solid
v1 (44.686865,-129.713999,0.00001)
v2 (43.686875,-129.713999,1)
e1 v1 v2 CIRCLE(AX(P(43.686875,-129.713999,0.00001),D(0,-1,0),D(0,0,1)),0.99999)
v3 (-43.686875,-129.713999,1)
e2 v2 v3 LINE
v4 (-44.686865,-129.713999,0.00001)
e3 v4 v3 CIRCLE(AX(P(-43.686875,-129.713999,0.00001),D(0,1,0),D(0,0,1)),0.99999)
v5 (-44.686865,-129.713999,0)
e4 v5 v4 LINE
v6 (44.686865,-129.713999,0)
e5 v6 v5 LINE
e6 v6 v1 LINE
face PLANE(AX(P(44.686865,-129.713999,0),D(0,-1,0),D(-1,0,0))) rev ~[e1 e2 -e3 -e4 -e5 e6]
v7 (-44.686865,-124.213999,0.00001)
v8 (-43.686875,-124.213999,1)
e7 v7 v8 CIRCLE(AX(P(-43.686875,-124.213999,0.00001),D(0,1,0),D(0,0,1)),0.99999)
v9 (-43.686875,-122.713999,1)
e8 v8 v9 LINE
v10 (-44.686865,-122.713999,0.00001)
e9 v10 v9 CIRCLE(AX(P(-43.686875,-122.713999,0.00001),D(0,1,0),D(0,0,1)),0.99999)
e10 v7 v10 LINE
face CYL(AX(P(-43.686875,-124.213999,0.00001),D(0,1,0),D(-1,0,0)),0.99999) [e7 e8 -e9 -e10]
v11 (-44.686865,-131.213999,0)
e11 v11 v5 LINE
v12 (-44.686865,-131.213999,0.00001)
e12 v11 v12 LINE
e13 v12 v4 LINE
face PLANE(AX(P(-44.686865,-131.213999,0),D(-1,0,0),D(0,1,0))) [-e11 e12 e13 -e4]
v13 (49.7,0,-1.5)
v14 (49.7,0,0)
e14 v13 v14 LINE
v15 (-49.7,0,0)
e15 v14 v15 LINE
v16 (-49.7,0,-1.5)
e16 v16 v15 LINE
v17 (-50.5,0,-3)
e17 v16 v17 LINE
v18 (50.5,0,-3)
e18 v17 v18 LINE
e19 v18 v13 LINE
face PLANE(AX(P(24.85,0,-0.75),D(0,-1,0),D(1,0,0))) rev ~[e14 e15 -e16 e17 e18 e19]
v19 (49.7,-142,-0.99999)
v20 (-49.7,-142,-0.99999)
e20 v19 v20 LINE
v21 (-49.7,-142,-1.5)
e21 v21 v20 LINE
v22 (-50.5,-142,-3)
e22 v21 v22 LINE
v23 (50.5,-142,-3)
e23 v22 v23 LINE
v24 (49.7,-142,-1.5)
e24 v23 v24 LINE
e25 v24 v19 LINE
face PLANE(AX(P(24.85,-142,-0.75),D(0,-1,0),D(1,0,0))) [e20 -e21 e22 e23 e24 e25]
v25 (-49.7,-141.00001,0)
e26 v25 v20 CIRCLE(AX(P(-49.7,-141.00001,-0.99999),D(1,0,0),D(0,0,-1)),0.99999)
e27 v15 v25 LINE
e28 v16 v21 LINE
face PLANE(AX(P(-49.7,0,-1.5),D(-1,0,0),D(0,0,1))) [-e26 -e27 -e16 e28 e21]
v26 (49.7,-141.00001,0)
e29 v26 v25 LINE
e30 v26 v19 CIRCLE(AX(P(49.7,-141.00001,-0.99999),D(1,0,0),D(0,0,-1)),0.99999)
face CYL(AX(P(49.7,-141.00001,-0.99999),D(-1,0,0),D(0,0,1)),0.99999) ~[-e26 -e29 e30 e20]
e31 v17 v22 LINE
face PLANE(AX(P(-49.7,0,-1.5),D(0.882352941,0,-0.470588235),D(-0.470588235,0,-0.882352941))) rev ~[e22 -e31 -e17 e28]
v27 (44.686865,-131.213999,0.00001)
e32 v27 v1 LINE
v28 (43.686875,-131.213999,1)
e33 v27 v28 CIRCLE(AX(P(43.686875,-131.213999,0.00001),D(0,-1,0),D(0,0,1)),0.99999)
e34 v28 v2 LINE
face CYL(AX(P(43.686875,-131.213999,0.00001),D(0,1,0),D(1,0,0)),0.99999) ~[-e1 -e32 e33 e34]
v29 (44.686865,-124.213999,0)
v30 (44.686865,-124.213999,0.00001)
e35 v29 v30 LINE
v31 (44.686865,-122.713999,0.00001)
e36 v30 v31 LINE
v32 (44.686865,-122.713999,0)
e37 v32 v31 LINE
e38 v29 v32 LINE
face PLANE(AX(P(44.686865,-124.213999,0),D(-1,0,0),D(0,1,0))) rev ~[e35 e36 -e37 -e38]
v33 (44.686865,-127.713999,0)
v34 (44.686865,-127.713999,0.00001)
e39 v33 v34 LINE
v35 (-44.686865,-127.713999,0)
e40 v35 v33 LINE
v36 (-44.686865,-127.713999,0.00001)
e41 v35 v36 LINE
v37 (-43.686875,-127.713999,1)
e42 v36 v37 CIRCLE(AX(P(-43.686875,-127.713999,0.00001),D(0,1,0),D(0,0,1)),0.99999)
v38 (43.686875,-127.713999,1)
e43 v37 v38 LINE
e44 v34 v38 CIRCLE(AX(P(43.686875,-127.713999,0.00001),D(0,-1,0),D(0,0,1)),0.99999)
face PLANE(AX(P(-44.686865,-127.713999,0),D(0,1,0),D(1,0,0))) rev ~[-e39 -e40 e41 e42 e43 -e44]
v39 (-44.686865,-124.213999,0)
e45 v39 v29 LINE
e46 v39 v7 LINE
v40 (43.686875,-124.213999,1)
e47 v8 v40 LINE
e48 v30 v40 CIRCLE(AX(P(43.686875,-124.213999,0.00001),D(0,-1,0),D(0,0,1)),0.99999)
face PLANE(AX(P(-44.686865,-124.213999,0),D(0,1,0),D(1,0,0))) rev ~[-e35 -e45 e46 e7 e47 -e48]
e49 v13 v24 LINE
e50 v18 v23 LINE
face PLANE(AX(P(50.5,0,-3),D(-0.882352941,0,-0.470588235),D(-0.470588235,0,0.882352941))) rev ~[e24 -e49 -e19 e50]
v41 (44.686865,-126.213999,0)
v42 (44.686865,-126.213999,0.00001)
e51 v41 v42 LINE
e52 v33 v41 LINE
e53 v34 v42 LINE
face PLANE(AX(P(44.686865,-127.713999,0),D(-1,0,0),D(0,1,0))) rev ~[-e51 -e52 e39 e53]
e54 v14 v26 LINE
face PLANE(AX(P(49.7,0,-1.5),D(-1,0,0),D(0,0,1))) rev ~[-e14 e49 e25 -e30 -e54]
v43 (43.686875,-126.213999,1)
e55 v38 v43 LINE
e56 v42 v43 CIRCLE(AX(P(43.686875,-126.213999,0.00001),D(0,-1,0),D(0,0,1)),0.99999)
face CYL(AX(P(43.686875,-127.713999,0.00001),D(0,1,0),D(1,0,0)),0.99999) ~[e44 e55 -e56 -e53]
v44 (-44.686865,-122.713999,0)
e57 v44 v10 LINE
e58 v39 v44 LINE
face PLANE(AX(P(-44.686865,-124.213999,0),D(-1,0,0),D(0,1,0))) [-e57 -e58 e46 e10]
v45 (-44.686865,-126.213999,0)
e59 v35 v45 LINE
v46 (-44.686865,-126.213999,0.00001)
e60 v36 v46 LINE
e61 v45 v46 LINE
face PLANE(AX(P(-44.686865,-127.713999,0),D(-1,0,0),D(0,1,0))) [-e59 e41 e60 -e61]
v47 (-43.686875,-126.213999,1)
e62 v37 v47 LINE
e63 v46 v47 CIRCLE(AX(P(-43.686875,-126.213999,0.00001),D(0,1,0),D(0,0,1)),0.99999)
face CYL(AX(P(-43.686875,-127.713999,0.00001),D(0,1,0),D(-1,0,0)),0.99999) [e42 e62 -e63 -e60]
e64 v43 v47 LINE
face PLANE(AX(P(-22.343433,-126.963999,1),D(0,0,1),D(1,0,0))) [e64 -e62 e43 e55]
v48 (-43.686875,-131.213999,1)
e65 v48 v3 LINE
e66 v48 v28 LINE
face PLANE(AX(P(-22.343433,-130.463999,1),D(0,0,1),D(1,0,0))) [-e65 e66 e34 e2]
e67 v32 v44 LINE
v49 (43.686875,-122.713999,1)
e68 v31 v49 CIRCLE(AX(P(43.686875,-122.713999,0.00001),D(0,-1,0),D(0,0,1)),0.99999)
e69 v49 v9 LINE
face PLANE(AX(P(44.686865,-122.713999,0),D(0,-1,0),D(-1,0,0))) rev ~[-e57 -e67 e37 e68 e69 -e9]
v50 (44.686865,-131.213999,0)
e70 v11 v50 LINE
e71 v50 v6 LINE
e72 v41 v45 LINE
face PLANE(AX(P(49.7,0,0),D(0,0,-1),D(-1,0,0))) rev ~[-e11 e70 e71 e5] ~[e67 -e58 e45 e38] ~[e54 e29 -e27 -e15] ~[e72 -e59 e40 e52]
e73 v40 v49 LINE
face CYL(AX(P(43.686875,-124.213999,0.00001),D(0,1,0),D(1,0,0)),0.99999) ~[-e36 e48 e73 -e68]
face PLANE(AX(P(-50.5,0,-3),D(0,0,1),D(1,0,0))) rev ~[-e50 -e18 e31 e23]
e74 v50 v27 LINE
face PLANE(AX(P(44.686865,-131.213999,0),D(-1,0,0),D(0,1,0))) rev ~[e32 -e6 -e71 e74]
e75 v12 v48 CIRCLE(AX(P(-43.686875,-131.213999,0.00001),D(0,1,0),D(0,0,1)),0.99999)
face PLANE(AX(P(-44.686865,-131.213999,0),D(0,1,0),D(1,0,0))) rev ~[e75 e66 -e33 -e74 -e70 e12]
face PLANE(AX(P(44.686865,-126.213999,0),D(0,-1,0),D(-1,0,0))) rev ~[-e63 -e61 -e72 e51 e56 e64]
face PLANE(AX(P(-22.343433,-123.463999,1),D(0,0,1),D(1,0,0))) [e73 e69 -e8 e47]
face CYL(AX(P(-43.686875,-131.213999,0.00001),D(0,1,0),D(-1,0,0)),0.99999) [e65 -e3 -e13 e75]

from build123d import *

# Parameters (mm, degrees)
F0_W     = 49.7
F0_H     = 1.5
F1_DEPTH = 142
F2_W     = 44.6868650615
F2_H     = 1.5
F3_DEPTH = 1
F4_R     = 0.99999


# Not quite as in the source:
# - a fillet or chamfer is up to 0.001 mm smaller than in the source, because OpenCascade refuses the exact size


with BuildPart() as f1:
    # F0 (on Front) → F1 (new body)
    with BuildSketch(Plane.XZ):
        with Locations((24.85, -0.75)):
            Rectangle(F0_W, F0_H)
        with Locations((-24.85, -0.75)):
            Rectangle(F0_W, F0_H)
        Polygon((49.7, -1.5), (0, -1.5), (0, -3), (50.5, -3), align=None)
        Polygon((0, -3), (0, -1.5), (-49.7, -1.5), (-50.5, -3), align=None)
    extrude(amount=F1_DEPTH)

    # F2 (on face) → F3 (join)
    with BuildSketch(Plane.XY):
        with Locations((-22.3434325308, -130.4639992552)):
            Rectangle(F2_W, F2_H)
        with Locations((22.3434325308, -130.4639992552)):
            Rectangle(F2_W, F2_H)
        with Locations((-22.3434325308, -126.9639992552)):
            Rectangle(F2_W, F2_H)
        with Locations((22.3434325308, -126.9639992552)):
            Rectangle(F2_W, F2_H)
        with Locations((-22.3434325308, -123.4639992552)):
            Rectangle(F2_W, F2_H)
        with Locations((22.3434325308, -123.4639992552)):
            Rectangle(F2_W, F2_H)
    extrude(amount=F3_DEPTH)

    # F4 (radius 1 in the source; OpenCascade refuses exactly that, so slightly less here)
    f4_edges = [f1.edges().sort_by_distance(p)[0] for p in [
        (-44.686865, -123.463999, 1),
        (-44.686865, -126.963999, 1),
        (-44.686865, -130.463999, 1),
        (44.686865, -123.463999, 1),
        (44.686865, -126.963999, 1),
        (44.686865, -130.463999, 1),
        (0, -142, 0),
    ]]
    fillet(f4_edges, radius=F4_R)


solid = f1.part
